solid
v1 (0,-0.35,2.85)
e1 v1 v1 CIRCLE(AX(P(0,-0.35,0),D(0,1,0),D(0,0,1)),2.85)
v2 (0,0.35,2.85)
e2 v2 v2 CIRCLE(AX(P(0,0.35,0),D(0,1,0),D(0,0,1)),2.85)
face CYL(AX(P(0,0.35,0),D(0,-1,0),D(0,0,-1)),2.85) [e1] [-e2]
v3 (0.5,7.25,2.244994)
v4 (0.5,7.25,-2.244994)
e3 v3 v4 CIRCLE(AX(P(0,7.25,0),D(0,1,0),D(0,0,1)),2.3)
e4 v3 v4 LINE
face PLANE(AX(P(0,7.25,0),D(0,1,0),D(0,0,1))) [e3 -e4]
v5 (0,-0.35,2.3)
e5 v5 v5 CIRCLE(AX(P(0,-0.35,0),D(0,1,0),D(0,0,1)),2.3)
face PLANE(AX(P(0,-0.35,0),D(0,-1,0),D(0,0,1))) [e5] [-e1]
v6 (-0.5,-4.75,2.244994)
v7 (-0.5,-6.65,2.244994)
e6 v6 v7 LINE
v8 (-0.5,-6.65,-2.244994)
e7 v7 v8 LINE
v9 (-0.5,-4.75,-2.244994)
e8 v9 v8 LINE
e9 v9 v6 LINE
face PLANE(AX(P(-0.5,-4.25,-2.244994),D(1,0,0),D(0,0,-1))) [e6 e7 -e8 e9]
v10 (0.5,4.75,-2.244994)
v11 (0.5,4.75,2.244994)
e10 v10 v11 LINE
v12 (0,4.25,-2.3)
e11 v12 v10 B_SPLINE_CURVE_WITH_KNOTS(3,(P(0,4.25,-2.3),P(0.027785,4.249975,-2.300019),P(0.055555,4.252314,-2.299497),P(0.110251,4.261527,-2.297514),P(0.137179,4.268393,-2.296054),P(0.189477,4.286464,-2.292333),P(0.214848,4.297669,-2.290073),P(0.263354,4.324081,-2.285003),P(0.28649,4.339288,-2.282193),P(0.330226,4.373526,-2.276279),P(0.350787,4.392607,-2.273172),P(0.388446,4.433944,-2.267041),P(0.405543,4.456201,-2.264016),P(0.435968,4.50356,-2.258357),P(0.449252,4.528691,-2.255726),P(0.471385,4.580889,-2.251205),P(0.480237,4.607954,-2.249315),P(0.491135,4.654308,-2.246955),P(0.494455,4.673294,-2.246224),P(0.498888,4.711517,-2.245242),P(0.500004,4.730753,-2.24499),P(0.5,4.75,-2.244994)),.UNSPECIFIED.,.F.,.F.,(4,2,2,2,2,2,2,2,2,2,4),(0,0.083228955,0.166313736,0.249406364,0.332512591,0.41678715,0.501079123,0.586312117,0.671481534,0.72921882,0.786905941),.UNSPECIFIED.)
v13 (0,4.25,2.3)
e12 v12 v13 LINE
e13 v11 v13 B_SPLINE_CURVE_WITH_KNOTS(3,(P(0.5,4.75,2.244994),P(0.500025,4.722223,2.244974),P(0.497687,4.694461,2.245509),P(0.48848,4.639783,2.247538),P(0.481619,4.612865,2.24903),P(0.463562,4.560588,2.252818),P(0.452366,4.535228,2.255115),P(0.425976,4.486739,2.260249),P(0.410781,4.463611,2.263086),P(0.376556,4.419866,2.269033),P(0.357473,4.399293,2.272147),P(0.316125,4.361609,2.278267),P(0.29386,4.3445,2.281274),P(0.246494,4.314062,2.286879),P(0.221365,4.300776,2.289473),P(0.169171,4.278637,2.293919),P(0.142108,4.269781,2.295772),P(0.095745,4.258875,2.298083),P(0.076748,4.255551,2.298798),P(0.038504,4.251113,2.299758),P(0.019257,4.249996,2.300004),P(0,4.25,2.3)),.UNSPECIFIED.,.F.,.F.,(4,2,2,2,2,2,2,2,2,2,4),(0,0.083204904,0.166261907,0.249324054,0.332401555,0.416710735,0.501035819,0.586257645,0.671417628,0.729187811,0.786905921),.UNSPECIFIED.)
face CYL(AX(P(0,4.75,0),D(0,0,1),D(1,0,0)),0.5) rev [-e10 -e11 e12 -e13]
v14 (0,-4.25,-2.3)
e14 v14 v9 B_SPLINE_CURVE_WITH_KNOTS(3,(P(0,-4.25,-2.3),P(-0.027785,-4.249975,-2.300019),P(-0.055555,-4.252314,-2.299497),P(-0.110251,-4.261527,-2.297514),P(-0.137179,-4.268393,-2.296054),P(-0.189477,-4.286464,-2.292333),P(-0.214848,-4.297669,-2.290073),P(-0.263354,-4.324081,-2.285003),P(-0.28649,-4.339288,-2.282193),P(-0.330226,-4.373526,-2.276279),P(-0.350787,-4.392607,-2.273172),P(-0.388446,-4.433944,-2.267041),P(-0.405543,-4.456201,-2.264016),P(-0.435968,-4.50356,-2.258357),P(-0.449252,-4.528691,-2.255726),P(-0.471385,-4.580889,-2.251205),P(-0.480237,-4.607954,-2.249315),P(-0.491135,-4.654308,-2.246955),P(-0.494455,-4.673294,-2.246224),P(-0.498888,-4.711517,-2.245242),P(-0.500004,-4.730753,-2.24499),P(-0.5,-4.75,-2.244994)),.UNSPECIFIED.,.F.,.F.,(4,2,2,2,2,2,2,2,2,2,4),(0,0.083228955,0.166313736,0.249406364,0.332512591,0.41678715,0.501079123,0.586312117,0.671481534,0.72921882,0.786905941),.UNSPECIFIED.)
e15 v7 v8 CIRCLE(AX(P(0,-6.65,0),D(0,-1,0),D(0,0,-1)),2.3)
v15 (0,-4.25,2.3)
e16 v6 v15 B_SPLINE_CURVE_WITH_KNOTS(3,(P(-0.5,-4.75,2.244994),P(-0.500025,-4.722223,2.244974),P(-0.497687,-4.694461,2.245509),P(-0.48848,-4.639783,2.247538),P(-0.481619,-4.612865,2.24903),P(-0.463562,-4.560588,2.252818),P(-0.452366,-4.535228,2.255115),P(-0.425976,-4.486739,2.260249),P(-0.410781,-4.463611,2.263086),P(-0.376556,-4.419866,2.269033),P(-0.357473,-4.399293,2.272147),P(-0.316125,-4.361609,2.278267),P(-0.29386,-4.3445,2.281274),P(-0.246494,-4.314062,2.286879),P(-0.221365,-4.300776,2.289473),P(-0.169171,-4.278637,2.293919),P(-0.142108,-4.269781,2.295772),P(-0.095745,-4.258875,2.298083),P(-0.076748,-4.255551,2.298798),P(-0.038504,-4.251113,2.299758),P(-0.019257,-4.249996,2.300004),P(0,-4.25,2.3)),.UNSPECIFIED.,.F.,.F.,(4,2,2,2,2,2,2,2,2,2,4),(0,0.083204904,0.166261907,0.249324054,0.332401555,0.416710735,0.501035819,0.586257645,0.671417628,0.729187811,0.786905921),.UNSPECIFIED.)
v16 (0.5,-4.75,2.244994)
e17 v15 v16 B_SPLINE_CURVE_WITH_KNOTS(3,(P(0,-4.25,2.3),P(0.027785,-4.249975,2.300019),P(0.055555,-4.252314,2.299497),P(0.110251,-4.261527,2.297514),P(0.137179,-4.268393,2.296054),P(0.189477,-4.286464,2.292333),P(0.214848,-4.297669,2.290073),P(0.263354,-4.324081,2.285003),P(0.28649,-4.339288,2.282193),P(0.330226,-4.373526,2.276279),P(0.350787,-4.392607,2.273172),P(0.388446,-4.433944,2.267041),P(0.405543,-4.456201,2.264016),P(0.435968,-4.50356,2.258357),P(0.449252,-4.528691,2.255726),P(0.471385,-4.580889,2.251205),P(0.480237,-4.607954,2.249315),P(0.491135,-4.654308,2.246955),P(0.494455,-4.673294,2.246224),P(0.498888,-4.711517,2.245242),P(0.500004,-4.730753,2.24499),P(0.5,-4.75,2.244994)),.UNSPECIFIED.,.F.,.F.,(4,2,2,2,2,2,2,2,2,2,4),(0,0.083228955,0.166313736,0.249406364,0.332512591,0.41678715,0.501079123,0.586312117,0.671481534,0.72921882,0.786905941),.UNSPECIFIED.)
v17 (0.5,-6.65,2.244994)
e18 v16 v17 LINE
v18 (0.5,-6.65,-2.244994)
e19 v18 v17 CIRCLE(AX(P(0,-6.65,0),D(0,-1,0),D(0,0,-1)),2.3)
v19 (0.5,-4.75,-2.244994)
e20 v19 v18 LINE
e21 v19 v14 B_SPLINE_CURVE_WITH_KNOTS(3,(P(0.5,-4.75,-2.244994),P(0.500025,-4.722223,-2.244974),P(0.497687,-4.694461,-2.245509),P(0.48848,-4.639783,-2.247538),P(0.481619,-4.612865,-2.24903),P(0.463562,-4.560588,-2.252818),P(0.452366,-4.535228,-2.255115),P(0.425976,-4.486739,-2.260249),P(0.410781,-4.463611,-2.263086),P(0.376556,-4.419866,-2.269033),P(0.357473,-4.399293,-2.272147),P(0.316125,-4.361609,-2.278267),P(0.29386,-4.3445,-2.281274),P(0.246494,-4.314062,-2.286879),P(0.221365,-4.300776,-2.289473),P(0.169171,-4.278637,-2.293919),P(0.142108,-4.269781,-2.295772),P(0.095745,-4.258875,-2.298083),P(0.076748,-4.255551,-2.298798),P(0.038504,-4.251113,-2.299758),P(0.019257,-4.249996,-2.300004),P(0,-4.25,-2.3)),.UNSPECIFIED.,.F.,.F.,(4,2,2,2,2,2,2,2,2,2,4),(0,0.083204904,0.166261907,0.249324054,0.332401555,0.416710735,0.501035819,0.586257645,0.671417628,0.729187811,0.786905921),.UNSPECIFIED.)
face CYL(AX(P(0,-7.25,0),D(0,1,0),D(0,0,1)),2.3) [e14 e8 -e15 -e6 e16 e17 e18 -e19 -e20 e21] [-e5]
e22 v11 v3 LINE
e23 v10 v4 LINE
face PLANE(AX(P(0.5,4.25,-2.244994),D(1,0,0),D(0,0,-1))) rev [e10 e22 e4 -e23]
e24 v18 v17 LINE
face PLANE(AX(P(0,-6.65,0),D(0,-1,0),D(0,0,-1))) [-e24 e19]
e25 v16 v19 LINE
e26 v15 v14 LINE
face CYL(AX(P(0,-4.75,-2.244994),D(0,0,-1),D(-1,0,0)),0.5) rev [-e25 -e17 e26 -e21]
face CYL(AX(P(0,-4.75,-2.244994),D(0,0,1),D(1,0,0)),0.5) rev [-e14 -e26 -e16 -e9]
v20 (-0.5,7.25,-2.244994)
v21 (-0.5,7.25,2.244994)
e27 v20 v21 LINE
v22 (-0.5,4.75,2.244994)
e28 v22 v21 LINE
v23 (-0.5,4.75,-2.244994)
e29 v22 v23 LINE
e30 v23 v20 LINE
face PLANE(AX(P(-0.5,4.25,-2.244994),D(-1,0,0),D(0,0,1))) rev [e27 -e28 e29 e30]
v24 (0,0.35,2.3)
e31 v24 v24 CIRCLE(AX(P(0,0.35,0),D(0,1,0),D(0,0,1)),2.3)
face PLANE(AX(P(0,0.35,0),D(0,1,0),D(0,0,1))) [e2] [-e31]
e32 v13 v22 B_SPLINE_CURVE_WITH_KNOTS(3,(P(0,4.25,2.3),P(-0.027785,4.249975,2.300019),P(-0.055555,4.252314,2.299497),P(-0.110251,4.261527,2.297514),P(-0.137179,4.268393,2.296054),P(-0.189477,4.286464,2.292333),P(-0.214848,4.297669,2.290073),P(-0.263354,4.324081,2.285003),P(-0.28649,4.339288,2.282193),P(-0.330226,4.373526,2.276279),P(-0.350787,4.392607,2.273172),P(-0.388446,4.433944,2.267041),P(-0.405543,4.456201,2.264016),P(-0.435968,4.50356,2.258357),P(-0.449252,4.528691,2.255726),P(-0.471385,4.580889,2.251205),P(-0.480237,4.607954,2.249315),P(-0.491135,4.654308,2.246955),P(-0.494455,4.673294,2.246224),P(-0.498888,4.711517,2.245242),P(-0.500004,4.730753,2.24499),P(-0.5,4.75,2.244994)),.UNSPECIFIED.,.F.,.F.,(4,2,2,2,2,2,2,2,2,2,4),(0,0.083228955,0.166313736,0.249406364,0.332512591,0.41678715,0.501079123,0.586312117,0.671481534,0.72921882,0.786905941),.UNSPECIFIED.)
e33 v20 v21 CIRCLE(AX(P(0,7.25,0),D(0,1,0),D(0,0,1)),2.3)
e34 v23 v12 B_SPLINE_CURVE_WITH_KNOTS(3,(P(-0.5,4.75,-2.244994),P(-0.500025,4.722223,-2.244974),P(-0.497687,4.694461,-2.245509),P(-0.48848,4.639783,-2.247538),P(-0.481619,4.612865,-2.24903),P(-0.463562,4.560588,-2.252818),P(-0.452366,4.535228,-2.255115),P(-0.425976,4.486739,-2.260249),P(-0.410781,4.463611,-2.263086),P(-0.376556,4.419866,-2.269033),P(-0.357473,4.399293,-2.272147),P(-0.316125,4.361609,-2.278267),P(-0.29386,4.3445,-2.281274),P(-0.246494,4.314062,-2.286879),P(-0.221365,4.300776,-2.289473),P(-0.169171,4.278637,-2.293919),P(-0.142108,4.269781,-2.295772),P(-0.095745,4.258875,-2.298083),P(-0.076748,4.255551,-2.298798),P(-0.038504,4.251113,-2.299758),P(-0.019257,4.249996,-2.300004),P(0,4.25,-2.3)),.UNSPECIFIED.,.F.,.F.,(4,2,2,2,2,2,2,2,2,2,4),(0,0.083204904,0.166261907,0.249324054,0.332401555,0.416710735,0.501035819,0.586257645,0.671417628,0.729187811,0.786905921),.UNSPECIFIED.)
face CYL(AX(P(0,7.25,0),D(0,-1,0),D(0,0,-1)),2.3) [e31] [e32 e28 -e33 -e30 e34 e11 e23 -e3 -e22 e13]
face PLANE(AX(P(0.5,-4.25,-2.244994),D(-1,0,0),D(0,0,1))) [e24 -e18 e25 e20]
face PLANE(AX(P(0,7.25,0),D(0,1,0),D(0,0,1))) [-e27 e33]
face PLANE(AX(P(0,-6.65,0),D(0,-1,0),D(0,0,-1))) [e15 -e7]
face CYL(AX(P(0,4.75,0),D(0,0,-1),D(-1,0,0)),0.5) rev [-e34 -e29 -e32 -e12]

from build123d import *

# Parameters (mm, degrees)
SKETCH2_R            = 2.85
BOSS_EXTRUDE1_DEPTH  = 0.35
SKETCH4_R            = 2.3
BOSS_EXTRUDE2_DEPTH  = 6.9
CUT_EXTRUDE1_START   = -3
CUT_EXTRUDE1_DEPTH   = 3
FILLET1_R            = 0.5
FILLET1_OF_MIRROR1_R = 0.5
CUT_EXTRUDE2_DEPTH   = 0.6


with BuildPart() as part:
    # Sketch2 → Boss-Extrude1 (new body)
    with BuildSketch(Plane(origin=(0, 0, 0), x_dir=(1, 0, 0), z_dir=(0, 1, 0))):
        with Locations(Location((0, 0, 0), (0, 0, 270))):
            Circle(SKETCH2_R)
    boss_extrude1 = extrude(amount=BOSS_EXTRUDE1_DEPTH)

    # Sketch4 → Boss-Extrude2 (add)
    with BuildSketch(Plane(origin=(0, 0.35, 0), x_dir=(1, 0, 0), z_dir=(0, 1, 0))):
        with Locations(Location((0, 0, 0), (0, 0, 90))):
            Circle(SKETCH4_R)
    boss_extrude2 = extrude(amount=BOSS_EXTRUDE2_DEPTH)

    # Sketch5 → Cut-Extrude1 (cut)
    with BuildSketch(Plane(origin=(0, 7.25, 0), x_dir=(1, 0, 0), z_dir=(0, 1, 0)).offset(CUT_EXTRUDE1_START)):
        with BuildLine():
            Line((-0.5, 2.244994432), (-0.5, -2.244994432))
            ThreePointArc((-0.5, -2.244994432), (0, -2.3), (0.5, -2.244994432))
            Line((0.5, -2.244994432), (0.5, 2.244994432))
            ThreePointArc((0.5, 2.244994432), (0, 2.3), (-0.5, 2.244994432))
        make_face()
    cut_extrude1 = extrude(amount=CUT_EXTRUDE1_DEPTH, mode=Mode.SUBTRACT)

    # Fillet1
    fillet1_edges = [part.edges().sort_by_distance(p)[0] for p in [
        (0.5, 4.25, 0),
        (-0.5, 4.25, 0),
    ]]
    fillet(fillet1_edges, radius=FILLET1_R - 0.0001)  # a hair under: the kernel refuses the full size

    # Mirror1: Boss-Extrude1, Boss-Extrude2, Cut-Extrude1 across plane
    add(boss_extrude1.mirror(Plane.ZX))
    add(boss_extrude2.mirror(Plane.ZX))
    add(cut_extrude1.mirror(Plane.ZX), mode=Mode.SUBTRACT)

    # Fillet1 of Mirror1
    fillet1_of_mirror1_edges = [part.edges().sort_by_distance(p)[0] for p in [
        (0.5, -4.25, 0),
        (-0.5, -4.25, 0),
    ]]
    fillet(fillet1_of_mirror1_edges, radius=FILLET1_OF_MIRROR1_R - 0.0001)  # a hair under: the kernel refuses the full size

    # Sketch6 → Cut-Extrude2 (cut)
    with BuildSketch(Plane(origin=(0, -7.25, 0), x_dir=(-1, 0, 0), z_dir=(0, -1, 0))):
        with BuildLine():
            ThreePointArc((0.5, -2.244994432), (2.244994432, 0.5), (-0.5, 2.244994432))
            ThreePointArc((-0.5, 2.244994432), (-2.244994432, -0.5), (0.5, -2.244994432))
        make_face()
    extrude(amount=-CUT_EXTRUDE2_DEPTH, mode=Mode.SUBTRACT)


solid = part.part
